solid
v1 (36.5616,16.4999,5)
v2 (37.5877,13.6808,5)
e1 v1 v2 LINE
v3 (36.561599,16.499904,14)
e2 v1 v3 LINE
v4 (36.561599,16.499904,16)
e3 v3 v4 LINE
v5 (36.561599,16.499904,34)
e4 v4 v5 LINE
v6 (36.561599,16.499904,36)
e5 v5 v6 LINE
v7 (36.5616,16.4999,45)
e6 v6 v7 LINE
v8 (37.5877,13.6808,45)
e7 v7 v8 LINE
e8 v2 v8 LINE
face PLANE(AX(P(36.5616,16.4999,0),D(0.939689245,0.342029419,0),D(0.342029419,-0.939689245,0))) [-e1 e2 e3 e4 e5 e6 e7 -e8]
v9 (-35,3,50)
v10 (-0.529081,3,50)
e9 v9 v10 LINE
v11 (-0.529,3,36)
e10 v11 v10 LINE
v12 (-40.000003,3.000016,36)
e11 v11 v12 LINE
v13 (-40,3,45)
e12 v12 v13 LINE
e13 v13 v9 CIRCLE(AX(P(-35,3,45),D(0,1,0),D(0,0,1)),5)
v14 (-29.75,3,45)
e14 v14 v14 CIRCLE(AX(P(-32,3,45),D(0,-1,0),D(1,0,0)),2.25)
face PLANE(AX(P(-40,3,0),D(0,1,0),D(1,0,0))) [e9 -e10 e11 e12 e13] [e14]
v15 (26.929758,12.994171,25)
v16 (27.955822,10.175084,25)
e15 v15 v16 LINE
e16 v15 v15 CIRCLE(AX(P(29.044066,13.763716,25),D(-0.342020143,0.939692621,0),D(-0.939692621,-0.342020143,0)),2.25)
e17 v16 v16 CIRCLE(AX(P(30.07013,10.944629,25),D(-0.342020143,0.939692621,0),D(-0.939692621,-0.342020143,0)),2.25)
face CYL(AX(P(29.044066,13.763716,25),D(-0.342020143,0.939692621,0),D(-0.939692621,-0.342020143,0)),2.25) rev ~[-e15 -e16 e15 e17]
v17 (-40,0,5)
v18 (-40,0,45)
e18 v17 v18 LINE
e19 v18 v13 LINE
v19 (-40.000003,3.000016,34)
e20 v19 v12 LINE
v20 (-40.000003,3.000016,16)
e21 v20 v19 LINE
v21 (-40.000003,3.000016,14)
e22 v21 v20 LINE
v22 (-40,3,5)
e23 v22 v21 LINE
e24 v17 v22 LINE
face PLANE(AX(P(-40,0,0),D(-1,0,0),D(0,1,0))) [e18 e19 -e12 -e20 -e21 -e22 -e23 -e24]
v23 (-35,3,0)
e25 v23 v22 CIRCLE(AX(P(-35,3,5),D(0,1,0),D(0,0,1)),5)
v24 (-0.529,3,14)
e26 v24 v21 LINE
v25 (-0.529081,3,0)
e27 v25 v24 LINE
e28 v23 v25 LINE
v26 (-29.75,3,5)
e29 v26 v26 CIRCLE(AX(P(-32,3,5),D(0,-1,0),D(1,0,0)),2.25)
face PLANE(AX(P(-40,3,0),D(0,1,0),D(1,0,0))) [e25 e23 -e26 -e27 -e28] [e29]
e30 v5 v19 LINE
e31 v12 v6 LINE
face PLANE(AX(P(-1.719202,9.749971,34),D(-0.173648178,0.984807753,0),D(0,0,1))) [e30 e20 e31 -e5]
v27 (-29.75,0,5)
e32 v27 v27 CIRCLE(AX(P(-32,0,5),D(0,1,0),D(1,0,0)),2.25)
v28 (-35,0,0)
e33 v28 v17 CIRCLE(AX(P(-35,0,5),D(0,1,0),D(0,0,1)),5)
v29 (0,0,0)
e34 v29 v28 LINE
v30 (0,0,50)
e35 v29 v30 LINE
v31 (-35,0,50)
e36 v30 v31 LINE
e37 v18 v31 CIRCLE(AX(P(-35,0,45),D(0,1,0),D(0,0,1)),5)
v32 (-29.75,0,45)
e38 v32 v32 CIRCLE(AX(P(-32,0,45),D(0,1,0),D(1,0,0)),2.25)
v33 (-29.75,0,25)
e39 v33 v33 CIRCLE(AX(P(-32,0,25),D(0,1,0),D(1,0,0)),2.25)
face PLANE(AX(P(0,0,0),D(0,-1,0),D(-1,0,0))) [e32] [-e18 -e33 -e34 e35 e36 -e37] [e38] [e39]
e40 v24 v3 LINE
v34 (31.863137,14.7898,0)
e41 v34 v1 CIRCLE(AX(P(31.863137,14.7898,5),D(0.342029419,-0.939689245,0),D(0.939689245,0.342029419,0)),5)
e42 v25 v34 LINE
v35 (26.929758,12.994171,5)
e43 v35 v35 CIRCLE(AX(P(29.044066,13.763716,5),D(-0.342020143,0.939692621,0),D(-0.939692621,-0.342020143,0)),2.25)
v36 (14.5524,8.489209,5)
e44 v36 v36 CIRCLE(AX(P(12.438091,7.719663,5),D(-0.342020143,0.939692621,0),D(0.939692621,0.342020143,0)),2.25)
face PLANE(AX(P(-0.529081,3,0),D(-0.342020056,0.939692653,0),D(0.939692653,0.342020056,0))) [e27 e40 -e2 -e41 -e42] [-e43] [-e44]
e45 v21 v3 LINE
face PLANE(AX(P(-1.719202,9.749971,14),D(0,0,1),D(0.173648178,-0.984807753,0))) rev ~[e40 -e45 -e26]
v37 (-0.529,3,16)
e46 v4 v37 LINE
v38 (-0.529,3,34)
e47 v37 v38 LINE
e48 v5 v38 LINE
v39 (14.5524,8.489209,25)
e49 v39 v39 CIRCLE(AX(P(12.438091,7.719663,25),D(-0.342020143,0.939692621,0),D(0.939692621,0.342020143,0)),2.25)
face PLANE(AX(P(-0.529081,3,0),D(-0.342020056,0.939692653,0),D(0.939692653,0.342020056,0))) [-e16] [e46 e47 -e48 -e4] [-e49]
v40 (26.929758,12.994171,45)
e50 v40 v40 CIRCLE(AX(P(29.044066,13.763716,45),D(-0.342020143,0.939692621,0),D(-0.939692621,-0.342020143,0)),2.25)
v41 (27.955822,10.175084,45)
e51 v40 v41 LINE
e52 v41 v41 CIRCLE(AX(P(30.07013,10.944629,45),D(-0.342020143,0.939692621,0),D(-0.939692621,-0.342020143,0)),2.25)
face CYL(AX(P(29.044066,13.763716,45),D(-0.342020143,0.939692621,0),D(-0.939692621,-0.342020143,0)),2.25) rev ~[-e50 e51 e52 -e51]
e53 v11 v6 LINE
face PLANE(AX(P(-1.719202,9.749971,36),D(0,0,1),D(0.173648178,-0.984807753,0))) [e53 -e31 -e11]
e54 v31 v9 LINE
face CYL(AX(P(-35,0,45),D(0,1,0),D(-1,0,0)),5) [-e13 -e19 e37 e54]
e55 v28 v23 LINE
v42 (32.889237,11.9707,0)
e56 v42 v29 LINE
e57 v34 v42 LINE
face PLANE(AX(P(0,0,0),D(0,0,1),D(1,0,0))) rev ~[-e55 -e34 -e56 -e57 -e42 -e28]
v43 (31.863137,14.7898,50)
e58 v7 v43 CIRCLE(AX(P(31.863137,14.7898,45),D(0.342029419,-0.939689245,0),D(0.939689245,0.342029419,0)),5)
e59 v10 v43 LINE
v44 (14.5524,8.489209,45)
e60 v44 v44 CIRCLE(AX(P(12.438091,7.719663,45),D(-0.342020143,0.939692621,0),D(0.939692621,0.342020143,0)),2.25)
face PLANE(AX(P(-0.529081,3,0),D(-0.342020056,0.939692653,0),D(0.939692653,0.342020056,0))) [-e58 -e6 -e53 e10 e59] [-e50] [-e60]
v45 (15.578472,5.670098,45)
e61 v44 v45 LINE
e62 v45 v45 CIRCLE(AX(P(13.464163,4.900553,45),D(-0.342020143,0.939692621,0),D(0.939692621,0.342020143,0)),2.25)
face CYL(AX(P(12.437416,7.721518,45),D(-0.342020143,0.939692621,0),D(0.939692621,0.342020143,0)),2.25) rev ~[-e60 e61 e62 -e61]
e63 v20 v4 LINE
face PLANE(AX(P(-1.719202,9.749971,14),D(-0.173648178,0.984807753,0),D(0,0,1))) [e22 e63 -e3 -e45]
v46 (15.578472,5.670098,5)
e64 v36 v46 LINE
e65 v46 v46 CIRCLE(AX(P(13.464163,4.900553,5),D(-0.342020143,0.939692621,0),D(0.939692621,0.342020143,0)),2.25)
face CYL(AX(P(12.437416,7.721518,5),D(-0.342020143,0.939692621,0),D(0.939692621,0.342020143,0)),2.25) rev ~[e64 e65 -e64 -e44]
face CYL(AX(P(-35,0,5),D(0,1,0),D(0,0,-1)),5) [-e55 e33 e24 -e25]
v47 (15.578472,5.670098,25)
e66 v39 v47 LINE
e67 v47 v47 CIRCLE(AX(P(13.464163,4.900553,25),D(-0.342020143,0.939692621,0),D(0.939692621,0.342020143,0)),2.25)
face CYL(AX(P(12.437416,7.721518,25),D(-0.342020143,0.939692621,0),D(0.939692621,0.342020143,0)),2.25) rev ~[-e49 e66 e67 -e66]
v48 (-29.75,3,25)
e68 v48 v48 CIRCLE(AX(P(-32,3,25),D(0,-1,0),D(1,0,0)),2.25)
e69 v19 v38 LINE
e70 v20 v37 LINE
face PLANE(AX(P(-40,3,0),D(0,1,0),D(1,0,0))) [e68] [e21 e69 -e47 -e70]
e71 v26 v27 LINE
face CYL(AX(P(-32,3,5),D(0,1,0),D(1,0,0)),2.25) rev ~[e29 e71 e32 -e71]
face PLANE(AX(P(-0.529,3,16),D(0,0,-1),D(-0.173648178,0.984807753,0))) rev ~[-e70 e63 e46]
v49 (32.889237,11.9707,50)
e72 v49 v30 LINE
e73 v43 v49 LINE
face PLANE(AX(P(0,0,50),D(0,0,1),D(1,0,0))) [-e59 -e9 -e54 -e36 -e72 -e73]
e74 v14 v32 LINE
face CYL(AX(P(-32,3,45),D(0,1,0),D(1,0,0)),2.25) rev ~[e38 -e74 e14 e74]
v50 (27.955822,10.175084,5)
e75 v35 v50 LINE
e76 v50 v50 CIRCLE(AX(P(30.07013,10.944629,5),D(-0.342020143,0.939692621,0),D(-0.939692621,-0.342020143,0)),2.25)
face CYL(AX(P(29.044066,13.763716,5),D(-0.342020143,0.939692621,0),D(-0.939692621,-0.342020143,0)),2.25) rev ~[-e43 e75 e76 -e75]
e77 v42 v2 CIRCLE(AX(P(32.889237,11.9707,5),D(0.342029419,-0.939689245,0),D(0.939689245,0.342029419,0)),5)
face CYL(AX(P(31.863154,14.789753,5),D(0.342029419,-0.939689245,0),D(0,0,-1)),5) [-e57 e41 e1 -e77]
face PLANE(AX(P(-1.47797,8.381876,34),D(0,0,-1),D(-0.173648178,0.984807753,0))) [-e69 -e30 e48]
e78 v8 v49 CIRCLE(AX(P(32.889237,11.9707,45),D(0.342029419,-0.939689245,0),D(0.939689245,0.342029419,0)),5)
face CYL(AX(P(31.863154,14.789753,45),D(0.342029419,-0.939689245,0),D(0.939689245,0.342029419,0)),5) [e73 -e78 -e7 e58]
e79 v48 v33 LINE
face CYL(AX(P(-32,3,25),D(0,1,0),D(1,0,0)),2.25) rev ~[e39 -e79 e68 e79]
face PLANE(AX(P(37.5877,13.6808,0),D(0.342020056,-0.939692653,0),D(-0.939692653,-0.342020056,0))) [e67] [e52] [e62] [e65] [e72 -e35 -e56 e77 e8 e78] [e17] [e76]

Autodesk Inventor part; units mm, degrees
ref_plane "YZ Plane" through (0, 0, 0) normal (1, 0, 0) x (0, 1, 0)
ref_plane "XZ Plane" through (0, 0, 0) normal (0, 1, 0) x (-1, 0, 0)
sketch "Sketch1" plane through (0, 0, 0) normal (0, 0, 1) x (1, 0, 0)
  line L0 (0, 0) -> (-40, 0)
  line L1 (-40, 0) -> (-40, 3)
  line L2 (-40, 3) -> (0, 3)
  line L3 (0, 3) -> (0, 0)
  line L4 (0, 0) -> (-1.0261, 2.8191)
  line L5 (-1.0261, 2.8191) -> (36.5616, 16.4999)
  line L6 (36.5616, 16.4999) -> (37.5877, 13.6808)
  line L7 (37.5877, 13.6808) -> (0, 0)
  point P0 (-0.529, 3)
  dimension "d0" = 160
  dimension "d1" = 3
  dimension "d2" = 3
  dimension "d3" = 40
  dimension "d4" = 40
extrude "Extrusion1" add sketch "Sketch1" along normal blind 50
sketch "Sketch2" plane through (-40, 3, 0) normal (0, 1, 0) x (1, 0, 0)
  line L0 (0, 0) -> (40, 0) projected
  line L1 (0, -50) -> (40, -50) projected
  circle A0 centre (8, -45) radius 2.25
  circle A1 centre (8, -25) radius 2.25
  circle A2 centre (8, -5) radius 2.25
  line L2 (8, 0) -> (8, -50)
  line L3 (0, 0) -> (0, -50) projected
  point P0 (8, -25)
  dimension "d7" = 4.5
  dimension "d8" = 4.5
  dimension "d9" = 4.5
  dimension "d10" = 20
  dimension "d12" = 8
  dimension "d13" = 20
extrude "Extrusion2" cut sketch "Sketch2" against normal blind 50 contours L2 A2 | A2 L2 | L2 A0 | A0 L2 | L2 A1 | A1 L2
ref_plane "Work Plane1" through (-0.529, 3, 0) normal (0.9848078, 0.1736482, 0) x (0, 0, -1)
mirror "Mirror1" about plane through (-0.529, 3, 0) normal (0.9848078, 0.1736482, 0) of "Extrusion2"
fillet "Fillet1" radius 5 4 edges at (37.0747, 15.0903, 0) (37.0747, 15.0903, 50) (-40, 1.5, 50) (-40, 1.5, 0)
sketch "Sketch3" plane through (-0.529, 3, 0) normal (0.9848078, 0.1736482, 0) x (0, 0, -1)
  line L0 (-5, 6.8541) -> (-45, 6.8541) projected
  ellipse E0 centre (-45, 5.4649) end of major axis (-47.25, 5.4649) minor radius 0.3907 projected
  ellipse E1 centre (-25, 5.4649) end of major axis (-27.25, 5.4649) minor radius 0.3907 projected
  ellipse E2 centre (-5, 5.4649) end of major axis (-7.25, 5.4649) minor radius 0.3907 projected
  line L1 (-25, 5.4649) -> (-25, 19.1248)
  line L2 (-45, 5.4649) -> (-25, 5.4649)
  line L3 (-36, -8.762) -> (-34, -8.762)
  line L4 (-34, -8.762) -> (-34, 19.6918)
  line L5 (-34, 19.6918) -> (-36, 19.6918)
  line L6 (-36, 19.6918) -> (-36, -8.762)
  line L7 (-36, -8.762) -> (-34, 19.6918) construction
  line L8 (-34, -8.762) -> (-36, 19.6918) construction
  ellipse E3 centre (-5, 5.9858) end of major axis (0, 5.9858) minor radius 0.8682 (0, 5.9858) -> (-5, 6.8541) ccw projected
  line L9 (-5, 6.8541) -> (-45, 6.8541) projected
  ellipse E4 centre (-45, 5.9858) end of major axis (-40, 5.9858) minor radius 0.8682 (-45, 6.8541) -> (-50, 5.9858) ccw projected
  line L10 (-50, 0) -> (-50, 5.9858) projected
  line L11 (0, 0) -> (-50, 0) projected
  line L12 (0, 0) -> (0, 5.9858) projected
  ellipse E5 centre (-45, 5.4649) end of major axis (-47.25, 5.4649) minor radius 0.3907 projected
  ellipse E6 centre (-25, 5.4649) end of major axis (-27.25, 5.4649) minor radius 0.3907 projected
  ellipse E7 centre (-5, 5.4649) end of major axis (-7.25, 5.4649) minor radius 0.3907 projected
  line L13 (-14, -8.762) -> (-16, -8.762)
  line L14 (-16, -8.762) -> (-16, 19.6918)
  line L15 (-16, 19.6918) -> (-14, 19.6918)
  line L16 (-14, 19.6918) -> (-14, -8.762)
  line L17 (-14, -8.762) -> (-16, 19.6918) construction
  line L18 (-16, -8.762) -> (-14, 19.6918) construction
  point P0 (0, -3.0463)
  point P1 (-35, 5.4649)
  point P2 (-15, 5.4649)
  point P3 (-14, 0)
  point P4 (-14, 6.8541)
  point P5 (-16, 6.8541)
  point P6 (-16, 0)
  point P7 (-36, 0)
  point P8 (-34, 0)
  point P9 (-34, 6.8541)
  point P10 (-36, 6.8541)
  dimension "d17" = 2
extrude "Extrusion3" add sketch "Sketch3" against normal up to next contours L16 L11 L14 L0 | L4 L2 L6 L0 | L11 L6 L2 L4
mirror "Mirror2" about plane through (-0.529, 3, 0) normal (0.9848078, 0.1736482, 0) of "Extrusion3"
sketch "Sketch4" plane through (-0.529, 3, 34) normal (-0.3420201, 0.9396926, 0) x (0.9396926, 0.3420201, 0)
  circle A0 centre (13.7993, 29) radius 2.25
  circle A1 centre (13.7993, 9) radius 2.25
  circle A2 centre (13.7993, -11) radius 2.25
  point P0 (-0.529, 34)
extrude "Extrusion4" cut sketch "Sketch4" against normal blind 10
equation "\"d13\" = d10"
properties part number "Angle_3DPrint"
